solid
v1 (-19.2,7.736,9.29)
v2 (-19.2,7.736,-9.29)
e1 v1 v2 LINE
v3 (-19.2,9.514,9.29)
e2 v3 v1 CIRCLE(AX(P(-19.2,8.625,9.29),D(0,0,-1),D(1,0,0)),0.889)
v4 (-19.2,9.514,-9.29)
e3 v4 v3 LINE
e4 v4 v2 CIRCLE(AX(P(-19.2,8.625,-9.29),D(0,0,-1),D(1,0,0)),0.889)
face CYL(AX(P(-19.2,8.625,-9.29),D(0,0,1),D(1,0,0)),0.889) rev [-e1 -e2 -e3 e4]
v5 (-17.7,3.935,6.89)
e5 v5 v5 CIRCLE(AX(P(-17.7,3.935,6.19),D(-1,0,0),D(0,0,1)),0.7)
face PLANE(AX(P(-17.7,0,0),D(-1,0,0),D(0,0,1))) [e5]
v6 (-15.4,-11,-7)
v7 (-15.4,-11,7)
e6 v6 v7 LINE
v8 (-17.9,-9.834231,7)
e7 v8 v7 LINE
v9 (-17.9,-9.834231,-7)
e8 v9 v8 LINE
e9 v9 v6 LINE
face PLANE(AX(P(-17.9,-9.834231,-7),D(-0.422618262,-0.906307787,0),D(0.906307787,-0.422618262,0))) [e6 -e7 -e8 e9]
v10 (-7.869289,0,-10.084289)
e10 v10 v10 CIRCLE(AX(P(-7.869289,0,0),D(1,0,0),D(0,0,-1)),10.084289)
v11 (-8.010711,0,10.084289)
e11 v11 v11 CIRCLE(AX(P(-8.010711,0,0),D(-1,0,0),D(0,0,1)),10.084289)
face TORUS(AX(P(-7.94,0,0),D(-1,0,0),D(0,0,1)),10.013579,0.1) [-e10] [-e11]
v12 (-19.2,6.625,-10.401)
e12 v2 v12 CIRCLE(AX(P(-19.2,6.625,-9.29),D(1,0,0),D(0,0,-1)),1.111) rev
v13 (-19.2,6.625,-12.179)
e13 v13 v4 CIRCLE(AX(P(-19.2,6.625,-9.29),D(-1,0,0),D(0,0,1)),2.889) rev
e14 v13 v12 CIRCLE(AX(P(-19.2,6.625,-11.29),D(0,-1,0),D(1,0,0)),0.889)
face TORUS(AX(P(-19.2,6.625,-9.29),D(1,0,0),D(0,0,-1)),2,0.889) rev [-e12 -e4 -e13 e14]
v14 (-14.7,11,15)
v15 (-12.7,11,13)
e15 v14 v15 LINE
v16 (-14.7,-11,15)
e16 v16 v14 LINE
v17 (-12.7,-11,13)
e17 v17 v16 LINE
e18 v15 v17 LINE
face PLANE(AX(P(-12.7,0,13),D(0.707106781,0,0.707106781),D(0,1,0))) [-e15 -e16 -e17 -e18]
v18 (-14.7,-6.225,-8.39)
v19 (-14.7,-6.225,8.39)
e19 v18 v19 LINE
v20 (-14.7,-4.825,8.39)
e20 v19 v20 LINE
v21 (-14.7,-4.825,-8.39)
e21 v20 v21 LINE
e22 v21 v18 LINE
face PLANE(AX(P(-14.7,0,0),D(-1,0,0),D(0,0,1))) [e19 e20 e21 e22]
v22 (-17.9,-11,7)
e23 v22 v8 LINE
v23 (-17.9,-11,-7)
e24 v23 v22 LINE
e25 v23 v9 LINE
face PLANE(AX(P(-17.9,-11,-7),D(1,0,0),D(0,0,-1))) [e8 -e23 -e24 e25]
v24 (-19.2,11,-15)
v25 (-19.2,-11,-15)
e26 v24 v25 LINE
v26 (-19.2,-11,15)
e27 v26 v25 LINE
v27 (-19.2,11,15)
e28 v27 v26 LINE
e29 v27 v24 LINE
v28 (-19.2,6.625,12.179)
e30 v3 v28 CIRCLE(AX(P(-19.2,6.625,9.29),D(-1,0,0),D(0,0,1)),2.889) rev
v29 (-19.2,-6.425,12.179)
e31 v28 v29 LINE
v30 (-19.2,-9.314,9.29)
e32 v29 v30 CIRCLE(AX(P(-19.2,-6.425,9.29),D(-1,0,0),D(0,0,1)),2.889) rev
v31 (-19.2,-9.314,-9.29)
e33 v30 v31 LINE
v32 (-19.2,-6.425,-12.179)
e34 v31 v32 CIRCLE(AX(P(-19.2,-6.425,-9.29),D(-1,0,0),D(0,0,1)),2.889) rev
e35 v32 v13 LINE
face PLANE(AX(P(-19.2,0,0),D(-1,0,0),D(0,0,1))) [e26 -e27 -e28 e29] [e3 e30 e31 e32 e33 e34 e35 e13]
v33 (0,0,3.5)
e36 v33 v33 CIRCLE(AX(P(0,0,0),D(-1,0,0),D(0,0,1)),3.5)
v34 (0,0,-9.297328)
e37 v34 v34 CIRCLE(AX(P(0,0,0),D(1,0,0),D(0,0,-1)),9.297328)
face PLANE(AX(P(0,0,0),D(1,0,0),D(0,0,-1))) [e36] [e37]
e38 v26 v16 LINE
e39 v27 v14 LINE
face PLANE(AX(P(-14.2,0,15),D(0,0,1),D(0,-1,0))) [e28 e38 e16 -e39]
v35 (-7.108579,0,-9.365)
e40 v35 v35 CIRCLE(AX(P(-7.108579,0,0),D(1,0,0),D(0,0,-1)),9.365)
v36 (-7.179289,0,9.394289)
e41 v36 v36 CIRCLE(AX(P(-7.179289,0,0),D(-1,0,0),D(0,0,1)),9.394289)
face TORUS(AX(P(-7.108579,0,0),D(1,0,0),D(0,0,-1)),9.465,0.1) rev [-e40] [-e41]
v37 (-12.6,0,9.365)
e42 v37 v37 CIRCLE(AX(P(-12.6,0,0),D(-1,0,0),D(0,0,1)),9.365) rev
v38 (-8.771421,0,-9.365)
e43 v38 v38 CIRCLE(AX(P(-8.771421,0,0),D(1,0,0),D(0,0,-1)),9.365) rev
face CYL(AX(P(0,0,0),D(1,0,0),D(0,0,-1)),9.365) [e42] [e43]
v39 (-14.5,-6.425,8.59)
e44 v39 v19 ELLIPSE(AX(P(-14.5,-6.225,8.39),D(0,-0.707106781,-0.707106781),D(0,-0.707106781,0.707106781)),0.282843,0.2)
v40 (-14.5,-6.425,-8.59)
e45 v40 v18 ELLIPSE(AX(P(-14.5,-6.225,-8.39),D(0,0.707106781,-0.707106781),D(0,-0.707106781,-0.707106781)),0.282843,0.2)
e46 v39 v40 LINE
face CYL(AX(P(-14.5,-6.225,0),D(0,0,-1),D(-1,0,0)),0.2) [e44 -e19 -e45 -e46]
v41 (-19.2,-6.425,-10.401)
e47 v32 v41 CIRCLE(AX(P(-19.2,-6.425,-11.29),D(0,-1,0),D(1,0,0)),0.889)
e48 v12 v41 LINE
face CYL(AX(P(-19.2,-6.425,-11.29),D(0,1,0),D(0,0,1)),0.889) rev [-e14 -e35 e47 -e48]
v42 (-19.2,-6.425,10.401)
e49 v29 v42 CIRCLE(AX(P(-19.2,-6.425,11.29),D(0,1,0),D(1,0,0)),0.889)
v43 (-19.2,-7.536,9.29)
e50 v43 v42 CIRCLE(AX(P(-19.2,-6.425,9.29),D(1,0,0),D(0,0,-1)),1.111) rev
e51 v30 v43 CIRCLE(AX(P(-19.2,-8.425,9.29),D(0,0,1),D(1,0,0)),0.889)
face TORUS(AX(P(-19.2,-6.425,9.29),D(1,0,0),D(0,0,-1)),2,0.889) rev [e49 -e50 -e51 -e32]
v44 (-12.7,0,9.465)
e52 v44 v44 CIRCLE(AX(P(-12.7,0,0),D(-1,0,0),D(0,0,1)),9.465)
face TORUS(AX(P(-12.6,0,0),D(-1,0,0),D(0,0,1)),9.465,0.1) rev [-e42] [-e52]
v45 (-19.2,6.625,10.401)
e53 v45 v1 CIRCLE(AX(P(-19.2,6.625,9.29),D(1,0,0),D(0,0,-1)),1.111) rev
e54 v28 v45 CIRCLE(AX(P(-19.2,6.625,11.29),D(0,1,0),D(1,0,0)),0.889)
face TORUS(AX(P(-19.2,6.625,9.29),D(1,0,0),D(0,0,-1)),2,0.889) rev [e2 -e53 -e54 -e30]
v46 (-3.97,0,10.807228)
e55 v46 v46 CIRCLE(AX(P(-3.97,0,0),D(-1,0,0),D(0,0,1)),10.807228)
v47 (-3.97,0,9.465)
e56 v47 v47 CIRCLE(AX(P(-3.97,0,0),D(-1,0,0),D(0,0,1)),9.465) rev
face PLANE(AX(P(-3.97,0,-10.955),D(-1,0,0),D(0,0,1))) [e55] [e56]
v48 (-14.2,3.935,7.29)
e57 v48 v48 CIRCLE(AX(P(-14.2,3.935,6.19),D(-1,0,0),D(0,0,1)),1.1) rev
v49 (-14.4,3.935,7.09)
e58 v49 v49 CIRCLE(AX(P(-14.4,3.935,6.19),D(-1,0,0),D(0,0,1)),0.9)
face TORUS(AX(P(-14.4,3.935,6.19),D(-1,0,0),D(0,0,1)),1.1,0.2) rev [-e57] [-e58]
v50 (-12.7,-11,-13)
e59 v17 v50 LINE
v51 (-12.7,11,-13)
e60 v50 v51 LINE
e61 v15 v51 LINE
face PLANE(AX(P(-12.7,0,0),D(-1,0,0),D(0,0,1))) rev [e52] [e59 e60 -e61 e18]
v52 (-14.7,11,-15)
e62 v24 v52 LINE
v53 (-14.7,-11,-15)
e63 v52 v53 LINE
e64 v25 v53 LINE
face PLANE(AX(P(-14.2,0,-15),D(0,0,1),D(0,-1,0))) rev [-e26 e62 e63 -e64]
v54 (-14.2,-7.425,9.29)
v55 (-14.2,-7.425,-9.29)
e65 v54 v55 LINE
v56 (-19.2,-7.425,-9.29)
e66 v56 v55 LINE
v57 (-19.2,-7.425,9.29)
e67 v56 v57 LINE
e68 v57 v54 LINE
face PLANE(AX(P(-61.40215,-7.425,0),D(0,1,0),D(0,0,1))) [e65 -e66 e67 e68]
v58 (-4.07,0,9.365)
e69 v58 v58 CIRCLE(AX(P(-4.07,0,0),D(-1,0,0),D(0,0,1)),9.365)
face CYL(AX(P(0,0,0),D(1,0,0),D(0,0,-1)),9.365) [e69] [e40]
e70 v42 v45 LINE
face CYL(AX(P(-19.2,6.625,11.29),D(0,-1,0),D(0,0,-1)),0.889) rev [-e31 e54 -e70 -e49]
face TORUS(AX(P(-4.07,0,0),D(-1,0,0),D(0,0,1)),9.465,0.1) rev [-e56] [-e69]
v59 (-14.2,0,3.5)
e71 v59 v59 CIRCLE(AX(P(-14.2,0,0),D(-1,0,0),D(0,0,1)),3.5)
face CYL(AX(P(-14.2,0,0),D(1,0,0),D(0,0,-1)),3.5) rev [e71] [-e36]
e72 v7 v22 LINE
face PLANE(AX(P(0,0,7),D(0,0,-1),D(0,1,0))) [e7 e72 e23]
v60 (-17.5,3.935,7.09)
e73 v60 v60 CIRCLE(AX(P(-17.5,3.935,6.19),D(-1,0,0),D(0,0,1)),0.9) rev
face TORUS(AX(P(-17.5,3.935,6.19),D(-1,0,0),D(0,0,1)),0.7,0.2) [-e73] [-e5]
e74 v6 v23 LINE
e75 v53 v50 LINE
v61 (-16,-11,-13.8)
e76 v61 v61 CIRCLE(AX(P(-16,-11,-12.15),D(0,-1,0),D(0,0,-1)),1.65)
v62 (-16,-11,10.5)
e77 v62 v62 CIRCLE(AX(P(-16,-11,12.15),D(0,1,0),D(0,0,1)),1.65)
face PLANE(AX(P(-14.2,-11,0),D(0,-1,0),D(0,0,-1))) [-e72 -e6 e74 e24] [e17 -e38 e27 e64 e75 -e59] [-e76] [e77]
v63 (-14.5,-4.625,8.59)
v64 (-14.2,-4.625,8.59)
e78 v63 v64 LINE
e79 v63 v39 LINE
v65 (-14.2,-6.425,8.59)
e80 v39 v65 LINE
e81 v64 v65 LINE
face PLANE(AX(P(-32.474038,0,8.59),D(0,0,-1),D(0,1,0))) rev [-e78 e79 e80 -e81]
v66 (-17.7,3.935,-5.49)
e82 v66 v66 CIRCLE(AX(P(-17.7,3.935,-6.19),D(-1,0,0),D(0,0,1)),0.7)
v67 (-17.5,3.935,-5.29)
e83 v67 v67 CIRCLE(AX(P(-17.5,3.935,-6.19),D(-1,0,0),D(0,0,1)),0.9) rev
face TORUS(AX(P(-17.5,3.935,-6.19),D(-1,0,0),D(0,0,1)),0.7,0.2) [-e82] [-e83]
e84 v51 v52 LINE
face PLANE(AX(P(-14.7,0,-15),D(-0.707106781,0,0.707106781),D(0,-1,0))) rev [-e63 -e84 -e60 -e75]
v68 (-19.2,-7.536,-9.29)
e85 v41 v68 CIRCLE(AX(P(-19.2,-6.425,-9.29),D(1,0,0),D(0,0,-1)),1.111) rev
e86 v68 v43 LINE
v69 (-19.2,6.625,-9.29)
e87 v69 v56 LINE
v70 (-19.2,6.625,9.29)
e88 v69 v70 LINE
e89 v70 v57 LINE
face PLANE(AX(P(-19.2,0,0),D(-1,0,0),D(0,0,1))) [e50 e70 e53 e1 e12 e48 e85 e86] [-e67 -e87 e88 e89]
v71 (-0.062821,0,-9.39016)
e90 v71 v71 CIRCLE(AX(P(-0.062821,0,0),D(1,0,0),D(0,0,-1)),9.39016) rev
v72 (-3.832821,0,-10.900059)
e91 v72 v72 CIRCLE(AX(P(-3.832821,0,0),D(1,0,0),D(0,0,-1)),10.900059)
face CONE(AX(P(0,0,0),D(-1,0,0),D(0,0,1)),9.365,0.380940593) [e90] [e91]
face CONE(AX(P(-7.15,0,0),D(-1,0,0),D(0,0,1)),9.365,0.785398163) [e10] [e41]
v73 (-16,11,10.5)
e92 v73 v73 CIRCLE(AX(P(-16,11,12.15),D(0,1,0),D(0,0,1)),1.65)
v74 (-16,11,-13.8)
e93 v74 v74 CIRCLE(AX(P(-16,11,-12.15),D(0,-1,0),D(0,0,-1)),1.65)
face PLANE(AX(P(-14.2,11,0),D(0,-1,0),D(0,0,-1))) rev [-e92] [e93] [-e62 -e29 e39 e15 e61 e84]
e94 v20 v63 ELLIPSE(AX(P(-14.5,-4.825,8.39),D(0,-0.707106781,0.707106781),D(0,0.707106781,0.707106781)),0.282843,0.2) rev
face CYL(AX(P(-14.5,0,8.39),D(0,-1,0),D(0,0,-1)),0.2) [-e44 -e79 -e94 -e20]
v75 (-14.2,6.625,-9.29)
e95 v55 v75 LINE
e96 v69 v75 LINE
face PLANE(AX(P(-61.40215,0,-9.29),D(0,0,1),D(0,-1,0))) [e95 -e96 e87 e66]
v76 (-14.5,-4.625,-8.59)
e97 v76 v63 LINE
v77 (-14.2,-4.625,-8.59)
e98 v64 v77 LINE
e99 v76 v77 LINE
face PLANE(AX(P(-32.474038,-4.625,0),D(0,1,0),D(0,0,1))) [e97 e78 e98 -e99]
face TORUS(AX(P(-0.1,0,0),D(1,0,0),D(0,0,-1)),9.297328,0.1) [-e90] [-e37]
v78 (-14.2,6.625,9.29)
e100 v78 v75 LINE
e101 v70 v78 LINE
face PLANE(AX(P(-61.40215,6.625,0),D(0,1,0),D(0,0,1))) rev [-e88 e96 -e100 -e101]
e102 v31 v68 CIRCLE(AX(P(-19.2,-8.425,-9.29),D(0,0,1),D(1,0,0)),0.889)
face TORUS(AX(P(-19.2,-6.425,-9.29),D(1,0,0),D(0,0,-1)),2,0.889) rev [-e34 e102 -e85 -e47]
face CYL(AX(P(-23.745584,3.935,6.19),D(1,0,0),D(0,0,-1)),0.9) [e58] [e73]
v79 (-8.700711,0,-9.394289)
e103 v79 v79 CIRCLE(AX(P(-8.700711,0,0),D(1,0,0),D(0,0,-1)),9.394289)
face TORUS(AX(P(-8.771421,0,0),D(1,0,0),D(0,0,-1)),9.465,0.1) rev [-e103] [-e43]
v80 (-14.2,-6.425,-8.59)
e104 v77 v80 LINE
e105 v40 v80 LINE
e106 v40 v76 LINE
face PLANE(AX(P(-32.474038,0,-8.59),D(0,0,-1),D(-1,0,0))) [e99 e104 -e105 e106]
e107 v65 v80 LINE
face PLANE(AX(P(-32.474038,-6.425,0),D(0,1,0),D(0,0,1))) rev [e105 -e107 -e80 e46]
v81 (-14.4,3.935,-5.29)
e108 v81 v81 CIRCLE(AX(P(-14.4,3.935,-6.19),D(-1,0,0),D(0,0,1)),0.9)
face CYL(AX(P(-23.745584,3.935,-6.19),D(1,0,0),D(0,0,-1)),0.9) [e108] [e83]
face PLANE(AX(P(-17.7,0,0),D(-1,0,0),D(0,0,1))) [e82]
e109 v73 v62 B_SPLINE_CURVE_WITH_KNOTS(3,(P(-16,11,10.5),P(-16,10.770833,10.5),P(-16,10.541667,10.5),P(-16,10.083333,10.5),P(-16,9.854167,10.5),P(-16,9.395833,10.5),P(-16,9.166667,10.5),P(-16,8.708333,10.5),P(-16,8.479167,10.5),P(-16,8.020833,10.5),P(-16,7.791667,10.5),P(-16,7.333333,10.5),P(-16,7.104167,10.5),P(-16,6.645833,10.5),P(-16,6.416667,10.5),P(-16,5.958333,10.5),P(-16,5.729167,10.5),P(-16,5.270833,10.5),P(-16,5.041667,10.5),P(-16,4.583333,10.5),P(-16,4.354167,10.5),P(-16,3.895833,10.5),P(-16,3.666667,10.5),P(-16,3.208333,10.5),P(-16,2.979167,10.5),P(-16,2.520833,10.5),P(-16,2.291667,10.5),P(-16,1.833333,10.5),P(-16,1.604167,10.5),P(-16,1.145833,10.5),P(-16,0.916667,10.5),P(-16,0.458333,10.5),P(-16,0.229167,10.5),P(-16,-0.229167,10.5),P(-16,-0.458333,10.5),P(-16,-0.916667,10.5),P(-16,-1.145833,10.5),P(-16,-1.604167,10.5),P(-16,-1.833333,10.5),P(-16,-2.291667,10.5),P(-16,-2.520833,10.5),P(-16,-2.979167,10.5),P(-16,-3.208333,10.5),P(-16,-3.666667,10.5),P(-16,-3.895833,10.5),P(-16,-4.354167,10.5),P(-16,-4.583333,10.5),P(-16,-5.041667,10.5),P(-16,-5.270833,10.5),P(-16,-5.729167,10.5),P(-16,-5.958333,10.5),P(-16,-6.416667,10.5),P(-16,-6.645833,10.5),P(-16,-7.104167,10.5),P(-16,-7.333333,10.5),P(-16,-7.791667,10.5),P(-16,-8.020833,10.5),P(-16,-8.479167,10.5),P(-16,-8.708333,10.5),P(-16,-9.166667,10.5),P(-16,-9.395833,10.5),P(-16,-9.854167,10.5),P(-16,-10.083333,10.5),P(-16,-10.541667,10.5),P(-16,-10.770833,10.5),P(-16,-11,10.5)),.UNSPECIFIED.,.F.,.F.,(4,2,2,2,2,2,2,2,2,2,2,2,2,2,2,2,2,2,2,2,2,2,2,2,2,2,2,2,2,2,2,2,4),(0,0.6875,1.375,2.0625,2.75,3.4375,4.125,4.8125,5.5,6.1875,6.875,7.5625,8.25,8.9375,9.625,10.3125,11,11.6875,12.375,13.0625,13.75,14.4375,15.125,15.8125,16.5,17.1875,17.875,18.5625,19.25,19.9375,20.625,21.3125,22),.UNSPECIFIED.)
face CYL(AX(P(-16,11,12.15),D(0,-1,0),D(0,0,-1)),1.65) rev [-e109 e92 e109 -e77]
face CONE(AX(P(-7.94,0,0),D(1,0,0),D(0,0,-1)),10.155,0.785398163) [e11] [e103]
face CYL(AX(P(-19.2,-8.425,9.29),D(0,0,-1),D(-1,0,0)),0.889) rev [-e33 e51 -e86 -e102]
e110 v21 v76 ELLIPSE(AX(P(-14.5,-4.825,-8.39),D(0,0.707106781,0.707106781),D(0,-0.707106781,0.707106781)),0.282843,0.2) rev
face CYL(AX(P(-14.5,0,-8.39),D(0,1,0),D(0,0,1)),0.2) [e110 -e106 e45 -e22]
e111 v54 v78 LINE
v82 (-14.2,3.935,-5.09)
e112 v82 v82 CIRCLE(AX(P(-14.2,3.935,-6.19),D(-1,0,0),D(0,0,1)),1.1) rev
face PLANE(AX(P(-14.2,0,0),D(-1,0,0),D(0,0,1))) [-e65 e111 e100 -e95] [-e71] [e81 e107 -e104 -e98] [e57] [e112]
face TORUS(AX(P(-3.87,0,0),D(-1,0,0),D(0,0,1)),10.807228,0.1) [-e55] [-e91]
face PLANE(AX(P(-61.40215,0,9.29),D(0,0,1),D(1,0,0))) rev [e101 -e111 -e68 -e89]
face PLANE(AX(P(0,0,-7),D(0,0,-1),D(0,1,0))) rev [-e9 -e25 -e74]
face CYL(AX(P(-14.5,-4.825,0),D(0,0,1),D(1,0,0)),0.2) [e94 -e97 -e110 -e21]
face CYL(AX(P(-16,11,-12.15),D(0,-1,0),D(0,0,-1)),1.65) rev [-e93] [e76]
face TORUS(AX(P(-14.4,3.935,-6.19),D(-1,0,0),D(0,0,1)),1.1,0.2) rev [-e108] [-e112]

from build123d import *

# Parameters (mm, degrees)
SKETCH2_W               = 30
SKETCH2_H               = 22
SKETCH2_R               = 3.5
BOSS_EXTRUDE1_DEPTH     = 1.5
BOSS_EXTRUDE2_DEPTH     = 2
SKETCH2_4_R             = 0.9
BOSS_EXTRUDE3_DEPTH     = 5
SKETCH2_5_R             = 3.5
SKETCH2_5_W             = 2.46
SKETCH2_5_H             = 4.35
CUT_EXTRUDE1_DEPTH      = 23.523099254
BOSS_EXTRUDE4_START     = 1.5
SKETCH2_6_W             = 30
SKETCH2_6_H             = 22
SKETCH2_6_W_2           = 18.58
SKETCH2_6_H_2           = 14.05
BOSS_EXTRUDE4_DEPTH     = 5
FILLET1_R               = 0.1
FILLET4_R               = 0.2
FILLET5_R               = 0.2
SKETCH4_R               = 1.65
CUT_EXTRUDE2_DEPTH      = 29.352953991
CUT_EXTRUDE3_DEPTH      = 7
CUT_EXTRUDE3_DEPTH_BACK = 7
CUT_SWEEP1_PROFILE_R    = 0.889
FILLET6_R               = 0.2
CHAMFER1_SIZE           = 2


with BuildPart() as part:
    # Sketch1 → Revolve1 (revolve)
    with BuildSketch(Plane(origin=(0, 0, 0), x_dir=(1, 0, 0), z_dir=(0, 1, 0))):
        Polygon((0, 0), (-12.7, 0), (-12.7, 9.365), (-8.73, 9.365), (-7.94, 10.155), (-7.15, 9.365), (-3.97, 9.365), (-3.97, 10.955), (0, 9.365), align=None)
    revolve(axis=Axis((0, 0, 0), (-1, 0, 0)))

    # Sketch2 → Boss-Extrude1 (add)
    with BuildSketch(Plane.ZY.offset(12.7)):
        Rectangle(SKETCH2_W, SKETCH2_H)
        Circle(SKETCH2_R, mode=Mode.SUBTRACT)
    extrude(amount=BOSS_EXTRUDE1_DEPTH)

    # Sketch2<3> → Boss-Extrude2 (add)
    with BuildSketch(Plane.ZY.offset(12.7)):
        with BuildLine():
            ThreePointArc((-8.143254878, -4.625), (-7.532295819, -5.564866997), (-6.813413242, -6.425))
            Line((-6.813413242, -6.425), (6.813413242, -6.425))
            ThreePointArc((6.813413242, -6.425), (7.532295819, -5.564866997), (8.143254878, -4.625))
            Line((8.143254878, -4.625), (-8.143254878, -4.625))
        make_face()
        with BuildLine():
            ThreePointArc((8.143254878, -4.625), (7.532295819, -5.564866997), (6.813413242, -6.425))
            Line((6.813413242, -6.425), (8.59, -6.425))
            Line((8.59, -6.425), (8.59, -4.625))
            Line((8.59, -4.625), (8.143254878, -4.625))
        make_face()
        with BuildLine():
            Line((-8.59, -4.625), (-8.59, -6.425))
            Line((-8.59, -6.425), (-6.813413242, -6.425))
            ThreePointArc((-6.813413242, -6.425), (-7.532295819, -5.564866997), (-8.143254878, -4.625))
            Line((-8.143254878, -4.625), (-8.59, -4.625))
        make_face()
    extrude(amount=BOSS_EXTRUDE2_DEPTH)

    # Sketch2<4> → Boss-Extrude3 (add)
    with BuildSketch(Plane.ZY.offset(12.7)):
        with Locations((6.19, 3.935)):
            Circle(SKETCH2_4_R)
        with Locations((-6.19, 3.935)):
            Circle(SKETCH2_4_R)
    extrude(amount=BOSS_EXTRUDE3_DEPTH)

    # Sketch2<5> → Cut-Extrude1 (cut, through all)
    # profile 1 of 2: a face of its own
    with BuildSketch(Plane.ZY.offset(12.7)):
        Circle(SKETCH2_5_R)
        with Locations((-0.31, 0.56)):
            Rectangle(SKETCH2_5_W, SKETCH2_5_H, mode=Mode.SUBTRACT)
    # profile 2 of 2: a face of its own
    with BuildSketch(Plane.ZY.offset(12.7)):
        with Locations((-0.31, 0.56)):
            Rectangle(SKETCH2_5_W, SKETCH2_5_H)
    extrude(amount=-CUT_EXTRUDE1_DEPTH, mode=Mode.SUBTRACT)

    # Sketch2<6> → Boss-Extrude4 (add)
    with BuildSketch(Plane.ZY.offset(12.7).offset(BOSS_EXTRUDE4_START)):
        Rectangle(SKETCH2_6_W, SKETCH2_6_H)
        with Locations((0, -0.4)):
            Rectangle(SKETCH2_6_W_2, SKETCH2_6_H_2, mode=Mode.SUBTRACT)
    extrude(amount=BOSS_EXTRUDE4_DEPTH)

    # Fillet1
    fillet1_edges = [part.edges().sort_by_distance(p)[0] for p in [
        (-3.97, 0, 9.365),
        (-3.97, 0, 10.955),
        (0, 0, 9.365),
        (-12.7, 0, 9.365),
        (-8.73, 0, 9.365),
        (-7.94, 0, 10.155),
        (-7.15, 0, 9.365),
    ]]
    fillet(fillet1_edges, radius=FILLET1_R)

    # Fillet4
    fillet4_edges = [part.edges().sort_by_distance(p)[0] for p in [
        (-17.7, 3.935, 5.29),
        (-17.7, 3.935, -7.09),
    ]]
    fillet(fillet4_edges, radius=FILLET4_R)

    # Fillet5
    fillet5_edges = [part.edges().sort_by_distance(p)[0] for p in [
        (-14.7, -4.625, 0),
        (-14.7, -5.525, -8.59),
        (-14.7, -6.425, 0),
        (-14.7, -5.525, 8.59),
    ]]
    fillet(fillet5_edges, radius=FILLET5_R)

    # Sketch4 → Cut-Extrude2 (cut, symmetric)
    with BuildSketch(Plane(origin=(0, 3.5, 0), x_dir=(-1, 0, 0), z_dir=(0, -1, 0))):
        with Locations(Location((16, 12.15, 0), (0, 0, 90))):
            Circle(SKETCH4_R)
    cut_extrude2 = extrude(amount=CUT_EXTRUDE2_DEPTH, both=True, mode=Mode.SUBTRACT)

    # Mirror1: Cut-Extrude2 across plane
    add(cut_extrude2.mirror(Plane(origin=(0, 0, 0), x_dir=(1, 0, 0), z_dir=(0, 0, -1))), mode=Mode.SUBTRACT)

    # Sketch5 → Cut-Extrude3 (cut, two sides: drawn at the far end of the back side and taken through both)
    with BuildSketch(Plane(origin=(0, 0, 0), x_dir=(-1, 0, 0), z_dir=(0, 0, -1)).offset(-CUT_EXTRUDE3_DEPTH_BACK)):
        Polygon((17.9, -11), (17.9, -9.834230855), (15.4, -11), align=None)
    extrude(amount=CUT_EXTRUDE3_DEPTH + CUT_EXTRUDE3_DEPTH_BACK, mode=Mode.SUBTRACT)

    # Cut-Sweep1: sweep along a path in Sketch6
    with BuildLine(Plane.ZY.offset(19.2)) as cut_sweep1_path:
        Line((-9.29, 8.625), (9.29, 8.625))
        ThreePointArc((9.29, 8.625), (10.704213562, 8.039213562), (11.29, 6.625))
        Line((11.29, 6.625), (11.29, -6.425))
        ThreePointArc((11.29, -6.425), (10.704213562, -7.839213562), (9.29, -8.425))
        Line((9.29, -8.425), (-9.29, -8.425))
        ThreePointArc((-9.29, -8.425), (-10.704213562, -7.839213562), (-11.29, -6.425))
        Line((-11.29, -6.425), (-11.29, 6.625))
        ThreePointArc((-11.29, 6.625), (-10.704213562, 8.039213562), (-9.29, 8.625))
    # Cut-Sweep1 profile (on start of the path) → Cut-Sweep1 (sweep, cut)
    with BuildSketch(Plane(origin=(-19.2, 8.625, -9.29), x_dir=(1, 0, 0), z_dir=(0, 0, 1))):
        Circle(CUT_SWEEP1_PROFILE_R)
    sweep(path=cut_sweep1_path.line, mode=Mode.SUBTRACT)

    # Fillet6
    fillet6_edges = [part.edges().sort_by_distance(p)[0] for p in [
        (-14.2, 3.935, 5.29),
        (-14.2, 3.935, -7.09),
    ]]
    fillet(fillet6_edges, radius=FILLET6_R)

    # Chamfer1
    # the kernel refuses this chamfer: 2 mm, written as the material it takes off along each edge
    with BuildSketch(Plane(origin=(-12.7, 16.143365976, -15), x_dir=(-0.9996219169112968, 0, -0.027495876610586487), z_dir=(0, -1, 0)), Plane(origin=(-12.7, -16.143365976, 15), x_dir=(-0.9996219169112968, 0, 0.02749587661058735), z_dir=(0, 1, 0))) as chamfer1_piece_1:
        Polygon((CHAMFER1_SIZE * 0.999621916911, -CHAMFER1_SIZE * 0.0274958766106), (-CHAMFER1_SIZE * 0.0274958766106, -CHAMFER1_SIZE * 0.999621916911), (0, 0), align=None)
    extrude(amount=32.286731952, mode=Mode.SUBTRACT)


solid = part.part
